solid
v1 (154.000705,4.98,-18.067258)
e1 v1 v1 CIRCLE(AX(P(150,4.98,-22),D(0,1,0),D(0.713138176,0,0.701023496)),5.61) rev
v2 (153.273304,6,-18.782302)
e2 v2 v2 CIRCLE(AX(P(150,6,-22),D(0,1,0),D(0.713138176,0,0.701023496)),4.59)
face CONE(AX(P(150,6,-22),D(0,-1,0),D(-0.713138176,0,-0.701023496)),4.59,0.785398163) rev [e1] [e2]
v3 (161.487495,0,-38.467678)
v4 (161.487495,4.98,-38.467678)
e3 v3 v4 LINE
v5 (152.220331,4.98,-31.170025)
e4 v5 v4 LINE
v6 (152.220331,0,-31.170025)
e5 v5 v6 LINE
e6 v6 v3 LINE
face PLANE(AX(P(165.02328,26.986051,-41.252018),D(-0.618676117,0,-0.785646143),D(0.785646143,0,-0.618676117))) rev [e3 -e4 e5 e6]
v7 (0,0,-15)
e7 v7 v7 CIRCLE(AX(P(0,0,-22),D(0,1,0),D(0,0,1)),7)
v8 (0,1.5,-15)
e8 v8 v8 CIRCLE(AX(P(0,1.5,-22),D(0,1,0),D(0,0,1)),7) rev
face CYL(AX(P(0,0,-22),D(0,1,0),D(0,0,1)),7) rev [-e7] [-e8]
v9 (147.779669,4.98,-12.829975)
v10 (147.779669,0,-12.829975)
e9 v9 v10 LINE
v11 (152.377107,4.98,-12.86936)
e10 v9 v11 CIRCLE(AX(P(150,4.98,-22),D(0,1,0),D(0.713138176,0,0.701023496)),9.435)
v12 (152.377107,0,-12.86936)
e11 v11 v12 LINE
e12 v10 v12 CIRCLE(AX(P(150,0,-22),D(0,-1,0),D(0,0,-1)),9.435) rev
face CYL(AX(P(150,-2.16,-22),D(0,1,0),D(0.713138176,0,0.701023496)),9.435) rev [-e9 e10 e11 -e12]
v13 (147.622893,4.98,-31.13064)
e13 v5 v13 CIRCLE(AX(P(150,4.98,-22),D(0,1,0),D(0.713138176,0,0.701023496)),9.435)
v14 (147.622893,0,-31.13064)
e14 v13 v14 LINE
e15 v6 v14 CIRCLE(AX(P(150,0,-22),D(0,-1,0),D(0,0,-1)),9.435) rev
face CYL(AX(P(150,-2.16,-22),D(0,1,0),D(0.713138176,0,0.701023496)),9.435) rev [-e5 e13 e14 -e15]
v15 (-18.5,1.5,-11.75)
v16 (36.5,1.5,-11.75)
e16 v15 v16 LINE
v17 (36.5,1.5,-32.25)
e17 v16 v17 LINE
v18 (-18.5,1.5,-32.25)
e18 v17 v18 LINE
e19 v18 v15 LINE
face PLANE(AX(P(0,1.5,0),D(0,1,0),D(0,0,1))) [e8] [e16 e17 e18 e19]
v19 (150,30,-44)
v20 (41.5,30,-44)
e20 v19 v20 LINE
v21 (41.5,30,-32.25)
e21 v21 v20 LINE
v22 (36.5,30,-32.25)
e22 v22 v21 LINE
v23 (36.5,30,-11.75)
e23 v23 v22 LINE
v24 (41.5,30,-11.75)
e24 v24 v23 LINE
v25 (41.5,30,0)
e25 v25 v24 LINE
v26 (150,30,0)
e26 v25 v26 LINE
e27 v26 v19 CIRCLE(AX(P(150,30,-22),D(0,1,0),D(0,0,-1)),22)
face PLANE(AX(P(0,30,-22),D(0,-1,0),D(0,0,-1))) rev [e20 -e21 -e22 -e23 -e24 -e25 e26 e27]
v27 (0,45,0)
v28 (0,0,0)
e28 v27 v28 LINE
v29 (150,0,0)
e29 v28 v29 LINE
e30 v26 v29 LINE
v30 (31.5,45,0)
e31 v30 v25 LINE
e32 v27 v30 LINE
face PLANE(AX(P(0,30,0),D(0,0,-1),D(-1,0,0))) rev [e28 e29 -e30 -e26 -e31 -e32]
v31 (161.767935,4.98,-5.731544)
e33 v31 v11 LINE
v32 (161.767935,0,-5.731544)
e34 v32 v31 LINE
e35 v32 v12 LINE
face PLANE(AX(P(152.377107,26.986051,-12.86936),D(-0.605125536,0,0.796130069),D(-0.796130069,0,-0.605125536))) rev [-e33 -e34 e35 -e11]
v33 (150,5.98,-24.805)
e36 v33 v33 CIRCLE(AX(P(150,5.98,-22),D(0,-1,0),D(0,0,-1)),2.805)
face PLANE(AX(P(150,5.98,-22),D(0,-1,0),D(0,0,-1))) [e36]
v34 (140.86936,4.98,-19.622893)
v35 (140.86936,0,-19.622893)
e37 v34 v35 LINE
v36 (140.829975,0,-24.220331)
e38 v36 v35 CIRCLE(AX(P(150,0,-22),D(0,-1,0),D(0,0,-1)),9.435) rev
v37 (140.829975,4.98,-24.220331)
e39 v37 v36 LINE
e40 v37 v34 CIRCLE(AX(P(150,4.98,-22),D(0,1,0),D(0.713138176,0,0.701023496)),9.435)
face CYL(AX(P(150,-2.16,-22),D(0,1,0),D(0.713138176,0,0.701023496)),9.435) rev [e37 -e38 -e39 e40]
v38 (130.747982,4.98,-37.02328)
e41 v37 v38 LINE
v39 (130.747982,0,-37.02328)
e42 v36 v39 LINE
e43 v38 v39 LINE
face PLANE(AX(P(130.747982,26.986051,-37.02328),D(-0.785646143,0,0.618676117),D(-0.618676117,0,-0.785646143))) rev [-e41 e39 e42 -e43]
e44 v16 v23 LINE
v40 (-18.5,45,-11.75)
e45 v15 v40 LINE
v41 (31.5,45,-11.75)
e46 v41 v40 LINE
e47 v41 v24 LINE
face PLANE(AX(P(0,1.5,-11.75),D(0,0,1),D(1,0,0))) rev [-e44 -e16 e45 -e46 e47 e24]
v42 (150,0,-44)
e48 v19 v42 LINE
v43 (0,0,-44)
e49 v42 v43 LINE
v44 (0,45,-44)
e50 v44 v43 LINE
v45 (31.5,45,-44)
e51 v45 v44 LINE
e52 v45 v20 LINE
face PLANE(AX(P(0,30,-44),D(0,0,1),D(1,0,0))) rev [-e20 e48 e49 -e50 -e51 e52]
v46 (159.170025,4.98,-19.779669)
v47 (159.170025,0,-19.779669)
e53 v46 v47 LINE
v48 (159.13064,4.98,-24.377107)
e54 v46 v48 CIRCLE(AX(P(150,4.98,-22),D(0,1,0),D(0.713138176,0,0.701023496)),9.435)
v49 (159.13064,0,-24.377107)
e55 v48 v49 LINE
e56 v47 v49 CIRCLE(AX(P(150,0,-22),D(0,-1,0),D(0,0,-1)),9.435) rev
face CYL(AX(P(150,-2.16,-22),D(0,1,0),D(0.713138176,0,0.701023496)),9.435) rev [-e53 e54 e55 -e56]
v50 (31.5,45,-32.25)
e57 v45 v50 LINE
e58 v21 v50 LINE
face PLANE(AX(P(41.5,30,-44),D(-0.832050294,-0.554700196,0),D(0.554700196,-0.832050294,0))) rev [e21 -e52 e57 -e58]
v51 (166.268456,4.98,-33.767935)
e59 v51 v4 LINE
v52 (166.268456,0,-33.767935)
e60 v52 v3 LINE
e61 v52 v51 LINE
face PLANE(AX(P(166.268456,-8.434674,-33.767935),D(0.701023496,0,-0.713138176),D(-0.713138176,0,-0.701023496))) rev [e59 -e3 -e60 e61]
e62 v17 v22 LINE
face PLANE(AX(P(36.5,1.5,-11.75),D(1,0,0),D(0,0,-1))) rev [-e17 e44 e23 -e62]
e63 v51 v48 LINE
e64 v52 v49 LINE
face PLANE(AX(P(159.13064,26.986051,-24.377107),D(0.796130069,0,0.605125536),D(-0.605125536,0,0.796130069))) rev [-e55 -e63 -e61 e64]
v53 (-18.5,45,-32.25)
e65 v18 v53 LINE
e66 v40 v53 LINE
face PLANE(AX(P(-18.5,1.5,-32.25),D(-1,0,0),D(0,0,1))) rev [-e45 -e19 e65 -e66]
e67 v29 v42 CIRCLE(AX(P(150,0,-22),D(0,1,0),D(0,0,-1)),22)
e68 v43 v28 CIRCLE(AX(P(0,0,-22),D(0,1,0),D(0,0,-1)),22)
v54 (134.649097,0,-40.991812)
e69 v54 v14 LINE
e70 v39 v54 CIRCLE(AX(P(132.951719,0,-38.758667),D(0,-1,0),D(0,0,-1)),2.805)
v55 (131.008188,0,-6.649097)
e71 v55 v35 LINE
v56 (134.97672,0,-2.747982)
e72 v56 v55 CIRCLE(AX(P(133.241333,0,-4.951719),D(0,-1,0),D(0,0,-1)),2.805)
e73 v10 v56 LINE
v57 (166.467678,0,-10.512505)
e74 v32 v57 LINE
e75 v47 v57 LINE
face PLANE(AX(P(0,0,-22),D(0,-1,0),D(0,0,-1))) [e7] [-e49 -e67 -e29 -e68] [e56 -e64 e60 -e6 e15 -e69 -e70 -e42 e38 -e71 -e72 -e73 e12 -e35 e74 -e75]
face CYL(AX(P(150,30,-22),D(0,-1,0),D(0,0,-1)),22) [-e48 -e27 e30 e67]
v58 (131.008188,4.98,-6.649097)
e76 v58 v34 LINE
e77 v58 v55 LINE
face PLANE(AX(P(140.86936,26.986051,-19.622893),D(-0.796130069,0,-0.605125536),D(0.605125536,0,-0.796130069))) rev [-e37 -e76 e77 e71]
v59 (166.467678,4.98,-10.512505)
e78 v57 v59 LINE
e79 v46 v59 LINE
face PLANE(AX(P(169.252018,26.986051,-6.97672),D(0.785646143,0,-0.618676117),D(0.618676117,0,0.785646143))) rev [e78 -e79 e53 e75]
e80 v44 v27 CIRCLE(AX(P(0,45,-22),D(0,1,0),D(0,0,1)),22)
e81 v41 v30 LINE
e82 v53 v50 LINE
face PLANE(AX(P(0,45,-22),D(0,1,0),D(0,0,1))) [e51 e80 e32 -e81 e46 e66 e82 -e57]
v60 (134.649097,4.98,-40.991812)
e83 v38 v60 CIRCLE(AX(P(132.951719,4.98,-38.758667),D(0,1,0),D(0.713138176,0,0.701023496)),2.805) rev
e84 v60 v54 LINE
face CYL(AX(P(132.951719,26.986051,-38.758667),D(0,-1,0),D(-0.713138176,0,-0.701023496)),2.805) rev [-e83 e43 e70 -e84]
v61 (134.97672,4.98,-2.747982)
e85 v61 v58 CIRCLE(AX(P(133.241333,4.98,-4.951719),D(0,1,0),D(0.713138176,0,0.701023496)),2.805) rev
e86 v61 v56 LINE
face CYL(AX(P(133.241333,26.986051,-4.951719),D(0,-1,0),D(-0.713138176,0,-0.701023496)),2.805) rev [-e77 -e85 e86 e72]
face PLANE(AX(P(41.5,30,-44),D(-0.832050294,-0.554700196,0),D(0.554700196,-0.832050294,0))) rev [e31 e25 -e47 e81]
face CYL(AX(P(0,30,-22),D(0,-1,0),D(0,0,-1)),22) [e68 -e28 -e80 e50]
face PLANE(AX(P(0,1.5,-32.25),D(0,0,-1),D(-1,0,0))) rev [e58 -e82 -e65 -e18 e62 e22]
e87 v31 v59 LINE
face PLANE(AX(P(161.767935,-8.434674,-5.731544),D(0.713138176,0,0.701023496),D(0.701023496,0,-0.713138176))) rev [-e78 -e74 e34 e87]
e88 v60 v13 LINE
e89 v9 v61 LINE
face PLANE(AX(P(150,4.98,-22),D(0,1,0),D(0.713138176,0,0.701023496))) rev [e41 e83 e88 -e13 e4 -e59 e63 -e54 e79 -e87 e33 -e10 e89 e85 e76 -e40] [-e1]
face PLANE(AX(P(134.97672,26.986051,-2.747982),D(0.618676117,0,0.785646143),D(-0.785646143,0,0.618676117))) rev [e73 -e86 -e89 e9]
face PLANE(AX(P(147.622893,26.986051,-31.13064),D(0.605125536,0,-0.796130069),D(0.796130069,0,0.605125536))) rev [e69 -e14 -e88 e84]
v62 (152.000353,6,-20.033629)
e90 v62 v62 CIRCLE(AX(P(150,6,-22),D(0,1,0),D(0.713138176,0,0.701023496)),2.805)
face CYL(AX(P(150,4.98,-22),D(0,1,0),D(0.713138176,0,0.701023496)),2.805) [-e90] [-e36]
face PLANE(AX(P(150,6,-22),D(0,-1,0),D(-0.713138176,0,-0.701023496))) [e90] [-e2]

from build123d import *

# Parameters (mm, degrees)
BOSS_EXTRUDE1_DEPTH = 30
SKETCH2_R           = 7
CUT_EXTRUDE1_DEPTH  = 181.055546985
CUT_EXTRUDE2_DEPTH  = 28.5
BOSS_EXTRUDE2_DEPTH = 15
CUT_EXTRUDE3_DEPTH  = 184.152941554
CAVITY1_OUTLINE_R   = 1.02
CAVITY1_DEPTH       = 4.98
CAVITY1_START       = 2.94
CAVITY1_2_OUTLINE_R = 1.683
CAVITY1_2_DEPTH     = 2.04
CAVITY1_START_2     = 4.98
CAVITY1_3_OUTLINE_R = 2.805
CAVITY1_3_DEPTH     = 1.02
SKETCH7_R           = 1.02
SKETCH7_R_2         = 5.61
CUT_EXTRUDE4_DEPTH  = 4.98
SKETCH8_R           = 2.805
CUT_EXTRUDE5_DEPTH  = 1
BOSS_EXTRUDE3_START = 4.98
BOSS_EXTRUDE3_DEPTH = 4.98


with BuildPart() as part:
    # Sketch1 → Boss-Extrude1 (new body)
    with BuildSketch(Plane(origin=(0, 0, 0), x_dir=(1, 0, 0), z_dir=(0, 1, 0))):
        with BuildLine():
            Line((0, 0), (150, 0))
            ThreePointArc((150, 0), (172, 22), (150, 44))
            Line((150, 44), (0, 44))
            ThreePointArc((0, 44), (-22, 22), (0, 0))
        make_face()
    extrude(amount=BOSS_EXTRUDE1_DEPTH)

    # Sketch2 → Cut-Extrude1 (cut, through all)
    with BuildSketch(Plane(origin=(0, 30, 0), x_dir=(1, 0, 0), z_dir=(0, 1, 0))):
        with Locations(Location((0, 22, 0), (0, 0, 270))):
            Circle(SKETCH2_R)
    extrude(amount=-CUT_EXTRUDE1_DEPTH, mode=Mode.SUBTRACT)

    # Sketch3 → Cut-Extrude2 (cut)
    with BuildSketch(Plane(origin=(0, 30, 0), x_dir=(1, 0, 0), z_dir=(0, 1, 0))):
        Polygon((0, 32.25), (-18.5, 32.25), (-18.5, 11.75), (0, 11.75), (36.5, 11.75), (36.5, 32.25), align=None)
    extrude(amount=-CUT_EXTRUDE2_DEPTH, mode=Mode.SUBTRACT)

    # Sketch5 → Boss-Extrude2 (add)
    with BuildSketch(Plane(origin=(0, 30, 0), x_dir=(1, 0, 0), z_dir=(0, 1, 0))):
        with BuildLine():
            Line((-18.5, 32.25), (-18.5, 11.75))
            Line((-18.5, 11.75), (41.5, 11.75))
            Line((41.5, 11.75), (41.5, 0))
            Line((41.5, 0), (0, 0))
            ThreePointArc((0, 0), (-22, 22), (0, 44))
            Line((0, 44), (41.5, 44))
            Line((41.5, 44), (41.5, 32.25))
            Line((41.5, 32.25), (-18.5, 32.25))
        make_face()
    extrude(amount=BOSS_EXTRUDE2_DEPTH)

    # Sketch6 → Cut-Extrude3 (cut, through all)
    with BuildSketch(Plane.XY):
        Polygon((31.5, 45), (41.5, 45), (41.5, 30), align=None)
    extrude(amount=-CUT_EXTRUDE3_DEPTH, mode=Mode.SUBTRACT)

    # Cavity1: read off the stored shape, not the designer's step
    # Cavity1 outline → Cavity1 (cut)
    with BuildSketch(Plane(origin=(0, 0, 0), x_dir=(1, 0, 0), z_dir=(0, 1, 0))):
        with BuildLine():
            ThreePointArc((147.779668933, 12.829975193), (150.080823725, 12.565346189), (152.377107132, 12.869360007))
            Line((152.377107132, 12.869360007), (163.360195023, 4.52129327))
            ThreePointArc((163.360195023, 4.52129327), (165.689039875, 6.577483091), (167.705029876, 8.941213032))
            Line((167.705029876, 8.941213032), (159.170024807, 19.779668933))
            ThreePointArc((159.170024807, 19.779668933), (159.434653811, 22.080823725), (159.130639993, 24.377107132))
            Line((159.130639993, 24.377107132), (167.47870673, 35.360195023))
            ThreePointArc((167.47870673, 35.360195023), (165.422516909, 37.689039875), (163.058786968, 39.705029876))
            Line((163.058786968, 39.705029876), (152.220331067, 31.170024807))
            ThreePointArc((152.220331067, 31.170024807), (149.919176275, 31.434653811), (147.622892868, 31.130639993))
            Line((147.622892868, 31.130639993), (134.649096594, 40.991811842))
            ThreePointArc((134.649096594, 40.991811842), (130.951366883, 40.725037906), (130.747982035, 37.023280491))
            Line((130.747982035, 37.023280491), (140.829975193, 24.220331067))
            ThreePointArc((140.829975193, 24.220331067), (140.565346189, 21.919176275), (140.869360007, 19.622892868))
            Line((140.869360007, 19.622892868), (131.008188158, 6.649096594))
            ThreePointArc((131.008188158, 6.649096594), (131.274962094, 2.951366883), (134.976719509, 2.747982035))
            Line((134.976719509, 2.747982035), (147.779668933, 12.829975193))
        make_face()
        with Locations((133.375227796, 5.087928153)):
            Circle(CAVITY1_OUTLINE_R, mode=Mode.SUBTRACT)
        with Locations((136.950447624, 8.724932851)):
            Circle(CAVITY1_OUTLINE_R, mode=Mode.SUBTRACT)
        with Locations((140.525667453, 12.36193755)):
            Circle(CAVITY1_OUTLINE_R, mode=Mode.SUBTRACT)
        with Locations((144.100887282, 15.998942248)):
            Circle(CAVITY1_OUTLINE_R, mode=Mode.SUBTRACT)
        with Locations((163.275067149, 8.950447624)):
            Circle(CAVITY1_OUTLINE_R, mode=Mode.SUBTRACT)
        with Locations((156.001057752, 16.100887282)):
            Circle(CAVITY1_OUTLINE_R, mode=Mode.SUBTRACT)
        with Locations((159.63806245, 12.525667453)):
            Circle(CAVITY1_OUTLINE_R, mode=Mode.SUBTRACT)
        with Locations((140.36193755, 31.474332547)):
            Circle(CAVITY1_OUTLINE_R, mode=Mode.SUBTRACT)
        with BuildLine():
            Line((152.373607277, 19.467574131), (152.689172923, 18.931653704))
            ThreePointArc((152.689172923, 18.931653704), (152.511383831, 18.784513838), (152.325559725, 18.647661717))
            Line((152.325559725, 18.647661717), (151.882040304, 19.083646698))
            Line((151.882040304, 19.083646698), (151.637288525, 18.939529681))
            Line((151.637288525, 18.939529681), (151.80339512, 18.340195901))
            ThreePointArc((151.80339512, 18.340195901), (151.593581444, 18.244084908), (151.378669205, 18.159990726))
            Line((151.378669205, 18.159990726), (151.063103559, 18.695911153))
            Line((151.063103559, 18.695911153), (150.789391266, 18.620051226))
            Line((150.789391266, 18.620051226), (150.794718919, 17.998147699))
            ThreePointArc((150.794718919, 17.998147699), (150.567179115, 17.959615383), (150.337824658, 17.934010022))
            Line((150.337824658, 17.934010022), (150.171718063, 18.533343802))
            Line((150.171718063, 18.533343802), (149.887698297, 18.530910694))
            Line((149.887698297, 18.530910694), (149.731883937, 17.928819118))
            ThreePointArc((149.731883937, 17.928819118), (149.502124467, 17.950491394), (149.273957918, 17.985119816))
            Line((149.273957918, 17.985119816), (149.268630266, 18.607023342))
            Line((149.268630266, 18.607023342), (148.993658503, 18.678182865))
            Line((148.993658503, 18.678182865), (148.687320622, 18.136934786))
            ThreePointArc((148.687320622, 18.136934786), (148.470999214, 18.217334723), (148.259569747, 18.309837059))
            Line((148.259569747, 18.309837059), (148.415384106, 18.911928635))
            Line((148.415384106, 18.911928635), (148.168199219, 19.051831385))
            Line((148.168199219, 19.051831385), (147.732214237, 18.608311964))
            ThreePointArc((147.732214237, 18.608311964), (147.544072837, 18.74196044), (147.363789021, 18.886032808))
            Line((147.363789021, 18.886032808), (147.670126902, 19.427280887))
            Line((147.670126902, 19.427280887), (147.467574131, 19.626392723))
            Line((147.467574131, 19.626392723), (146.931653704, 19.310827077))
            ThreePointArc((146.931653704, 19.310827077), (146.784513838, 19.488616169), (146.647661717, 19.674440275))
            Line((146.647661717, 19.674440275), (147.083646698, 20.117959696))
            Line((147.083646698, 20.117959696), (146.939529681, 20.362711475))
            Line((146.939529681, 20.362711475), (146.340195901, 20.19660488))
            ThreePointArc((146.340195901, 20.19660488), (146.244084908, 20.406418556), (146.159990726, 20.621330795))
            Line((146.159990726, 20.621330795), (146.695911153, 20.936896441))
            Line((146.695911153, 20.936896441), (146.620051226, 21.210608734))
            Line((146.620051226, 21.210608734), (145.998147699, 21.205281081))
            ThreePointArc((145.998147699, 21.205281081), (145.959615383, 21.432820885), (145.934010022, 21.662175342))
            Line((145.934010022, 21.662175342), (146.533343802, 21.828281937))
            Line((146.533343802, 21.828281937), (146.530910694, 22.112301703))
            Line((146.530910694, 22.112301703), (145.928819118, 22.268116063))
            ThreePointArc((145.928819118, 22.268116063), (145.950491394, 22.497875533), (145.985119816, 22.726042082))
            Line((145.985119816, 22.726042082), (146.607023342, 22.731369734))
            Line((146.607023342, 22.731369734), (146.678182865, 23.006341497))
            Line((146.678182865, 23.006341497), (146.136934786, 23.312679378))
            ThreePointArc((146.136934786, 23.312679378), (146.217334723, 23.529000786), (146.309837059, 23.740430253))
            Line((146.309837059, 23.740430253), (146.911928635, 23.584615894))
            Line((146.911928635, 23.584615894), (147.051831385, 23.831800781))
            Line((147.051831385, 23.831800781), (146.608311964, 24.267785763))
            ThreePointArc((146.608311964, 24.267785763), (146.74196044, 24.455927163), (146.886032808, 24.636210979))
            Line((146.886032808, 24.636210979), (147.427280887, 24.329873098))
            Line((147.427280887, 24.329873098), (147.626392723, 24.532425869))
            Line((147.626392723, 24.532425869), (147.310827077, 25.068346296))
            ThreePointArc((147.310827077, 25.068346296), (147.488616169, 25.215486162), (147.674440275, 25.352338283))
            Line((147.674440275, 25.352338283), (148.117959696, 24.916353302))
            Line((148.117959696, 24.916353302), (148.362711475, 25.060470319))
            Line((148.362711475, 25.060470319), (148.19660488, 25.659804099))
            ThreePointArc((148.19660488, 25.659804099), (148.406418556, 25.755915092), (148.621330795, 25.840009274))
            Line((148.621330795, 25.840009274), (148.936896441, 25.304088847))
            Line((148.936896441, 25.304088847), (149.210608734, 25.379948774))
            Line((149.210608734, 25.379948774), (149.205281081, 26.001852301))
            ThreePointArc((149.205281081, 26.001852301), (149.432820885, 26.040384617), (149.662175342, 26.065989978))
            Line((149.662175342, 26.065989978), (149.828281937, 25.466656198))
            Line((149.828281937, 25.466656198), (150.112301703, 25.469089306))
            Line((150.112301703, 25.469089306), (150.268116063, 26.071180882))
            ThreePointArc((150.268116063, 26.071180882), (150.497875533, 26.049508606), (150.726042082, 26.014880184))
            Line((150.726042082, 26.014880184), (150.731369734, 25.392976658))
            Line((150.731369734, 25.392976658), (151.006341497, 25.321817135))
            Line((151.006341497, 25.321817135), (151.312679378, 25.863065214))
            ThreePointArc((151.312679378, 25.863065214), (151.529000786, 25.782665277), (151.740430253, 25.690162941))
            Line((151.740430253, 25.690162941), (151.584615894, 25.088071365))
            Line((151.584615894, 25.088071365), (151.831800781, 24.948168615))
            Line((151.831800781, 24.948168615), (152.267785763, 25.391688036))
            ThreePointArc((152.267785763, 25.391688036), (152.455927163, 25.25803956), (152.636210979, 25.113967192))
            Line((152.636210979, 25.113967192), (152.329873098, 24.572719113))
            Line((152.329873098, 24.572719113), (152.532425869, 24.373607277))
            Line((152.532425869, 24.373607277), (153.068346296, 24.689172923))
            ThreePointArc((153.068346296, 24.689172923), (153.215486162, 24.511383831), (153.352338283, 24.325559725))
            Line((153.352338283, 24.325559725), (152.916353302, 23.882040304))
            Line((152.916353302, 23.882040304), (153.060470319, 23.637288525))
            Line((153.060470319, 23.637288525), (153.659804099, 23.80339512))
            ThreePointArc((153.659804099, 23.80339512), (153.755915092, 23.593581444), (153.840009274, 23.378669205))
            Line((153.840009274, 23.378669205), (153.304088847, 23.063103559))
            Line((153.304088847, 23.063103559), (153.379948774, 22.789391266))
            Line((153.379948774, 22.789391266), (154.001852301, 22.794718919))
            ThreePointArc((154.001852301, 22.794718919), (154.040384617, 22.567179115), (154.065989978, 22.337824658))
            Line((154.065989978, 22.337824658), (153.466656198, 22.171718063))
            Line((153.466656198, 22.171718063), (153.469089306, 21.887698297))
            Line((153.469089306, 21.887698297), (154.071180882, 21.731883937))
            ThreePointArc((154.071180882, 21.731883937), (154.049508606, 21.502124467), (154.014880184, 21.273957918))
            Line((154.014880184, 21.273957918), (153.392976658, 21.268630266))
            Line((153.392976658, 21.268630266), (153.321817135, 20.993658503))
            Line((153.321817135, 20.993658503), (153.863065214, 20.687320622))
            ThreePointArc((153.863065214, 20.687320622), (153.782665277, 20.470999214), (153.690162941, 20.259569747))
            Line((153.690162941, 20.259569747), (153.088071365, 20.415384106))
            Line((153.088071365, 20.415384106), (152.948168615, 20.168199219))
            Line((152.948168615, 20.168199219), (153.391688036, 19.732214237))
            ThreePointArc((153.391688036, 19.732214237), (153.25803956, 19.544072837), (153.113967192, 19.363789021))
            Line((153.113967192, 19.363789021), (152.572719113, 19.670126902))
            Line((152.572719113, 19.670126902), (152.373607277, 19.467574131))
        make_face(mode=Mode.SUBTRACT)
        with Locations((143.998942248, 27.899112718)):
            Circle(CAVITY1_OUTLINE_R, mode=Mode.SUBTRACT)
        with Locations((136.724932851, 35.049552376)):
            Circle(CAVITY1_OUTLINE_R, mode=Mode.SUBTRACT)
        with Locations((133.087928153, 38.624772204)):
            Circle(CAVITY1_OUTLINE_R, mode=Mode.SUBTRACT)
        with Locations((155.899112718, 28.001057752)):
            Circle(CAVITY1_OUTLINE_R, mode=Mode.SUBTRACT)
        with Locations((159.474332547, 31.63806245)):
            Circle(CAVITY1_OUTLINE_R, mode=Mode.SUBTRACT)
        with Locations((163.049552376, 35.275067149)):
            Circle(CAVITY1_OUTLINE_R, mode=Mode.SUBTRACT)
    extrude(amount=CAVITY1_DEPTH, mode=Mode.SUBTRACT)

    # Cavity1 2 outline → Cavity1 2 (cut)
    with BuildSketch(Plane(origin=(0, 0, 0), x_dir=(1, 0, 0), z_dir=(0, 1, 0)).offset(CAVITY1_START)):
        with BuildLine():
            ThreePointArc((152.325559725, 18.647661717), (152.511383831, 18.784513838), (152.689172923, 18.931653704))
            Line((152.689172923, 18.931653704), (152.373607277, 19.467574131))
            Line((152.373607277, 19.467574131), (152.572719113, 19.670126902))
            Line((152.572719113, 19.670126902), (153.113967192, 19.363789021))
            ThreePointArc((153.113967192, 19.363789021), (153.25803956, 19.544072837), (153.391688036, 19.732214237))
            Line((153.391688036, 19.732214237), (152.948168615, 20.168199219))
            Line((152.948168615, 20.168199219), (153.088071365, 20.415384106))
            Line((153.088071365, 20.415384106), (153.690162941, 20.259569747))
            ThreePointArc((153.690162941, 20.259569747), (153.782665277, 20.470999214), (153.863065214, 20.687320622))
            Line((153.863065214, 20.687320622), (153.321817135, 20.993658503))
            Line((153.321817135, 20.993658503), (153.392976658, 21.268630266))
            Line((153.392976658, 21.268630266), (154.014880184, 21.273957918))
            ThreePointArc((154.014880184, 21.273957918), (154.049508606, 21.502124467), (154.071180882, 21.731883937))
            Line((154.071180882, 21.731883937), (153.469089306, 21.887698297))
            Line((153.469089306, 21.887698297), (153.466656198, 22.171718063))
            Line((153.466656198, 22.171718063), (154.065989978, 22.337824658))
            ThreePointArc((154.065989978, 22.337824658), (154.040384617, 22.567179115), (154.001852301, 22.794718919))
            Line((154.001852301, 22.794718919), (153.379948774, 22.789391266))
            Line((153.379948774, 22.789391266), (153.304088847, 23.063103559))
            Line((153.304088847, 23.063103559), (153.840009274, 23.378669205))
            ThreePointArc((153.840009274, 23.378669205), (153.755915092, 23.593581444), (153.659804099, 23.80339512))
            Line((153.659804099, 23.80339512), (153.060470319, 23.637288525))
            Line((153.060470319, 23.637288525), (152.916353302, 23.882040304))
            Line((152.916353302, 23.882040304), (153.352338283, 24.325559725))
            ThreePointArc((153.352338283, 24.325559725), (153.215486162, 24.511383831), (153.068346296, 24.689172923))
            Line((153.068346296, 24.689172923), (152.532425869, 24.373607277))
            Line((152.532425869, 24.373607277), (152.329873098, 24.572719113))
            Line((152.329873098, 24.572719113), (152.636210979, 25.113967192))
            ThreePointArc((152.636210979, 25.113967192), (152.455927163, 25.25803956), (152.267785763, 25.391688036))
            Line((152.267785763, 25.391688036), (151.831800781, 24.948168615))
            Line((151.831800781, 24.948168615), (151.584615894, 25.088071365))
            Line((151.584615894, 25.088071365), (151.740430253, 25.690162941))
            ThreePointArc((151.740430253, 25.690162941), (151.529000786, 25.782665277), (151.312679378, 25.863065214))
            Line((151.312679378, 25.863065214), (151.006341497, 25.321817135))
            Line((151.006341497, 25.321817135), (150.731369734, 25.392976658))
            Line((150.731369734, 25.392976658), (150.726042082, 26.014880184))
            ThreePointArc((150.726042082, 26.014880184), (150.497875533, 26.049508606), (150.268116063, 26.071180882))
            Line((150.268116063, 26.071180882), (150.112301703, 25.469089306))
            Line((150.112301703, 25.469089306), (149.828281937, 25.466656198))
            Line((149.828281937, 25.466656198), (149.662175342, 26.065989978))
            ThreePointArc((149.662175342, 26.065989978), (149.432820885, 26.040384617), (149.205281081, 26.001852301))
            Line((149.205281081, 26.001852301), (149.210608734, 25.379948774))
            Line((149.210608734, 25.379948774), (148.936896441, 25.304088847))
            Line((148.936896441, 25.304088847), (148.621330795, 25.840009274))
            ThreePointArc((148.621330795, 25.840009274), (148.406418556, 25.755915092), (148.19660488, 25.659804099))
            Line((148.19660488, 25.659804099), (148.362711475, 25.060470319))
            Line((148.362711475, 25.060470319), (148.117959696, 24.916353302))
            Line((148.117959696, 24.916353302), (147.674440275, 25.352338283))
            ThreePointArc((147.674440275, 25.352338283), (147.488616169, 25.215486162), (147.310827077, 25.068346296))
            Line((147.310827077, 25.068346296), (147.626392723, 24.532425869))
            Line((147.626392723, 24.532425869), (147.427280887, 24.329873098))
            Line((147.427280887, 24.329873098), (146.886032808, 24.636210979))
            ThreePointArc((146.886032808, 24.636210979), (146.74196044, 24.455927163), (146.608311964, 24.267785763))
            Line((146.608311964, 24.267785763), (147.051831385, 23.831800781))
            Line((147.051831385, 23.831800781), (146.911928635, 23.584615894))
            Line((146.911928635, 23.584615894), (146.309837059, 23.740430253))
            ThreePointArc((146.309837059, 23.740430253), (146.217334723, 23.529000786), (146.136934786, 23.312679378))
            Line((146.136934786, 23.312679378), (146.678182865, 23.006341497))
            Line((146.678182865, 23.006341497), (146.607023342, 22.731369734))
            Line((146.607023342, 22.731369734), (145.985119816, 22.726042082))
            ThreePointArc((145.985119816, 22.726042082), (145.950491394, 22.497875533), (145.928819118, 22.268116063))
            Line((145.928819118, 22.268116063), (146.530910694, 22.112301703))
            Line((146.530910694, 22.112301703), (146.533343802, 21.828281937))
            Line((146.533343802, 21.828281937), (145.934010022, 21.662175342))
            ThreePointArc((145.934010022, 21.662175342), (145.959615383, 21.432820885), (145.998147699, 21.205281081))
            Line((145.998147699, 21.205281081), (146.620051226, 21.210608734))
            Line((146.620051226, 21.210608734), (146.695911153, 20.936896441))
            Line((146.695911153, 20.936896441), (146.159990726, 20.621330795))
            ThreePointArc((146.159990726, 20.621330795), (146.244084908, 20.406418556), (146.340195901, 20.19660488))
            Line((146.340195901, 20.19660488), (146.939529681, 20.362711475))
            Line((146.939529681, 20.362711475), (147.083646698, 20.117959696))
            Line((147.083646698, 20.117959696), (146.647661717, 19.674440275))
            ThreePointArc((146.647661717, 19.674440275), (146.784513838, 19.488616169), (146.931653704, 19.310827077))
            Line((146.931653704, 19.310827077), (147.467574131, 19.626392723))
            Line((147.467574131, 19.626392723), (147.670126902, 19.427280887))
            Line((147.670126902, 19.427280887), (147.363789021, 18.886032808))
            ThreePointArc((147.363789021, 18.886032808), (147.544072837, 18.74196044), (147.732214237, 18.608311964))
            Line((147.732214237, 18.608311964), (148.168199219, 19.051831385))
            Line((148.168199219, 19.051831385), (148.415384106, 18.911928635))
            Line((148.415384106, 18.911928635), (148.259569747, 18.309837059))
            ThreePointArc((148.259569747, 18.309837059), (148.470999214, 18.217334723), (148.687320622, 18.136934786))
            Line((148.687320622, 18.136934786), (148.993658503, 18.678182865))
            Line((148.993658503, 18.678182865), (149.268630266, 18.607023342))
            Line((149.268630266, 18.607023342), (149.273957918, 17.985119816))
            ThreePointArc((149.273957918, 17.985119816), (149.502124467, 17.950491394), (149.731883937, 17.928819118))
            Line((149.731883937, 17.928819118), (149.887698297, 18.530910694))
            Line((149.887698297, 18.530910694), (150.171718063, 18.533343802))
            Line((150.171718063, 18.533343802), (150.337824658, 17.934010022))
            ThreePointArc((150.337824658, 17.934010022), (150.567179115, 17.959615383), (150.794718919, 17.998147699))
            Line((150.794718919, 17.998147699), (150.789391266, 18.620051226))
            Line((150.789391266, 18.620051226), (151.063103559, 18.695911153))
            Line((151.063103559, 18.695911153), (151.378669205, 18.159990726))
            ThreePointArc((151.378669205, 18.159990726), (151.593581444, 18.244084908), (151.80339512, 18.340195901))
            Line((151.80339512, 18.340195901), (151.637288525, 18.939529681))
            Line((151.637288525, 18.939529681), (151.882040304, 19.083646698))
            Line((151.882040304, 19.083646698), (152.325559725, 18.647661717))
        make_face()
        with Locations((150, 22)):
            Circle(CAVITY1_2_OUTLINE_R, mode=Mode.SUBTRACT)
    extrude(amount=CAVITY1_2_DEPTH, mode=Mode.SUBTRACT)

    # Cavity1 3 outline → Cavity1 3 (cut)
    with BuildSketch(Plane(origin=(0, 0, 0), x_dir=(1, 0, 0), z_dir=(0, 1, 0)).offset(CAVITY1_START_2)):
        with BuildLine():
            ThreePointArc((152.325559725, 18.647661717), (152.511383831, 18.784513838), (152.689172923, 18.931653704))
            Line((152.689172923, 18.931653704), (152.373607277, 19.467574131))
            Line((152.373607277, 19.467574131), (152.572719113, 19.670126902))
            Line((152.572719113, 19.670126902), (153.113967192, 19.363789021))
            ThreePointArc((153.113967192, 19.363789021), (153.25803956, 19.544072837), (153.391688036, 19.732214237))
            Line((153.391688036, 19.732214237), (152.948168615, 20.168199219))
            Line((152.948168615, 20.168199219), (153.088071365, 20.415384106))
            Line((153.088071365, 20.415384106), (153.690162941, 20.259569747))
            ThreePointArc((153.690162941, 20.259569747), (153.782665277, 20.470999214), (153.863065214, 20.687320622))
            Line((153.863065214, 20.687320622), (153.321817135, 20.993658503))
            Line((153.321817135, 20.993658503), (153.392976658, 21.268630266))
            Line((153.392976658, 21.268630266), (154.014880184, 21.273957918))
            ThreePointArc((154.014880184, 21.273957918), (154.049508606, 21.502124467), (154.071180882, 21.731883937))
            Line((154.071180882, 21.731883937), (153.469089306, 21.887698297))
            Line((153.469089306, 21.887698297), (153.466656198, 22.171718063))
            Line((153.466656198, 22.171718063), (154.065989978, 22.337824658))
            ThreePointArc((154.065989978, 22.337824658), (154.040384617, 22.567179115), (154.001852301, 22.794718919))
            Line((154.001852301, 22.794718919), (153.379948774, 22.789391266))
            Line((153.379948774, 22.789391266), (153.304088847, 23.063103559))
            Line((153.304088847, 23.063103559), (153.840009274, 23.378669205))
            ThreePointArc((153.840009274, 23.378669205), (153.755915092, 23.593581444), (153.659804099, 23.80339512))
            Line((153.659804099, 23.80339512), (153.060470319, 23.637288525))
            Line((153.060470319, 23.637288525), (152.916353302, 23.882040304))
            Line((152.916353302, 23.882040304), (153.352338283, 24.325559725))
            ThreePointArc((153.352338283, 24.325559725), (153.215486162, 24.511383831), (153.068346296, 24.689172923))
            Line((153.068346296, 24.689172923), (152.532425869, 24.373607277))
            Line((152.532425869, 24.373607277), (152.329873098, 24.572719113))
            Line((152.329873098, 24.572719113), (152.636210979, 25.113967192))
            ThreePointArc((152.636210979, 25.113967192), (152.455927163, 25.25803956), (152.267785763, 25.391688036))
            Line((152.267785763, 25.391688036), (151.831800781, 24.948168615))
            Line((151.831800781, 24.948168615), (151.584615894, 25.088071365))
            Line((151.584615894, 25.088071365), (151.740430253, 25.690162941))
            ThreePointArc((151.740430253, 25.690162941), (151.529000786, 25.782665277), (151.312679378, 25.863065214))
            Line((151.312679378, 25.863065214), (151.006341497, 25.321817135))
            Line((151.006341497, 25.321817135), (150.731369734, 25.392976658))
            Line((150.731369734, 25.392976658), (150.726042082, 26.014880184))
            ThreePointArc((150.726042082, 26.014880184), (150.497875533, 26.049508606), (150.268116063, 26.071180882))
            Line((150.268116063, 26.071180882), (150.112301703, 25.469089306))
            Line((150.112301703, 25.469089306), (149.828281937, 25.466656198))
            Line((149.828281937, 25.466656198), (149.662175342, 26.065989978))
            ThreePointArc((149.662175342, 26.065989978), (149.432820885, 26.040384617), (149.205281081, 26.001852301))
            Line((149.205281081, 26.001852301), (149.210608734, 25.379948774))
            Line((149.210608734, 25.379948774), (148.936896441, 25.304088847))
            Line((148.936896441, 25.304088847), (148.621330795, 25.840009274))
            ThreePointArc((148.621330795, 25.840009274), (148.406418556, 25.755915092), (148.19660488, 25.659804099))
            Line((148.19660488, 25.659804099), (148.362711475, 25.060470319))
            Line((148.362711475, 25.060470319), (148.117959696, 24.916353302))
            Line((148.117959696, 24.916353302), (147.674440275, 25.352338283))
            ThreePointArc((147.674440275, 25.352338283), (147.488616169, 25.215486162), (147.310827077, 25.068346296))
            Line((147.310827077, 25.068346296), (147.626392723, 24.532425869))
            Line((147.626392723, 24.532425869), (147.427280887, 24.329873098))
            Line((147.427280887, 24.329873098), (146.886032808, 24.636210979))
            ThreePointArc((146.886032808, 24.636210979), (146.74196044, 24.455927163), (146.608311964, 24.267785763))
            Line((146.608311964, 24.267785763), (147.051831385, 23.831800781))
            Line((147.051831385, 23.831800781), (146.911928635, 23.584615894))
            Line((146.911928635, 23.584615894), (146.309837059, 23.740430253))
            ThreePointArc((146.309837059, 23.740430253), (146.217334723, 23.529000786), (146.136934786, 23.312679378))
            Line((146.136934786, 23.312679378), (146.678182865, 23.006341497))
            Line((146.678182865, 23.006341497), (146.607023342, 22.731369734))
            Line((146.607023342, 22.731369734), (145.985119816, 22.726042082))
            ThreePointArc((145.985119816, 22.726042082), (145.950491394, 22.497875533), (145.928819118, 22.268116063))
            Line((145.928819118, 22.268116063), (146.530910694, 22.112301703))
            Line((146.530910694, 22.112301703), (146.533343802, 21.828281937))
            Line((146.533343802, 21.828281937), (145.934010022, 21.662175342))
            ThreePointArc((145.934010022, 21.662175342), (145.959615383, 21.432820885), (145.998147699, 21.205281081))
            Line((145.998147699, 21.205281081), (146.620051226, 21.210608734))
            Line((146.620051226, 21.210608734), (146.695911153, 20.936896441))
            Line((146.695911153, 20.936896441), (146.159990726, 20.621330795))
            ThreePointArc((146.159990726, 20.621330795), (146.244084908, 20.406418556), (146.340195901, 20.19660488))
            Line((146.340195901, 20.19660488), (146.939529681, 20.362711475))
            Line((146.939529681, 20.362711475), (147.083646698, 20.117959696))
            Line((147.083646698, 20.117959696), (146.647661717, 19.674440275))
            ThreePointArc((146.647661717, 19.674440275), (146.784513838, 19.488616169), (146.931653704, 19.310827077))
            Line((146.931653704, 19.310827077), (147.467574131, 19.626392723))
            Line((147.467574131, 19.626392723), (147.670126902, 19.427280887))
            Line((147.670126902, 19.427280887), (147.363789021, 18.886032808))
            ThreePointArc((147.363789021, 18.886032808), (147.544072837, 18.74196044), (147.732214237, 18.608311964))
            Line((147.732214237, 18.608311964), (148.168199219, 19.051831385))
            Line((148.168199219, 19.051831385), (148.415384106, 18.911928635))
            Line((148.415384106, 18.911928635), (148.259569747, 18.309837059))
            ThreePointArc((148.259569747, 18.309837059), (148.470999214, 18.217334723), (148.687320622, 18.136934786))
            Line((148.687320622, 18.136934786), (148.993658503, 18.678182865))
            Line((148.993658503, 18.678182865), (149.268630266, 18.607023342))
            Line((149.268630266, 18.607023342), (149.273957918, 17.985119816))
            ThreePointArc((149.273957918, 17.985119816), (149.502124467, 17.950491394), (149.731883937, 17.928819118))
            Line((149.731883937, 17.928819118), (149.887698297, 18.530910694))
            Line((149.887698297, 18.530910694), (150.171718063, 18.533343802))
            Line((150.171718063, 18.533343802), (150.337824658, 17.934010022))
            ThreePointArc((150.337824658, 17.934010022), (150.567179115, 17.959615383), (150.794718919, 17.998147699))
            Line((150.794718919, 17.998147699), (150.789391266, 18.620051226))
            Line((150.789391266, 18.620051226), (151.063103559, 18.695911153))
            Line((151.063103559, 18.695911153), (151.378669205, 18.159990726))
            ThreePointArc((151.378669205, 18.159990726), (151.593581444, 18.244084908), (151.80339512, 18.340195901))
            Line((151.80339512, 18.340195901), (151.637288525, 18.939529681))
            Line((151.637288525, 18.939529681), (151.882040304, 19.083646698))
            Line((151.882040304, 19.083646698), (152.325559725, 18.647661717))
        make_face()
        with Locations((150, 22)):
            Circle(CAVITY1_3_OUTLINE_R, mode=Mode.SUBTRACT)
    extrude(amount=CAVITY1_3_DEPTH, mode=Mode.SUBTRACT)

    # Cavity1 4 outline → Cavity1 4 (revolve, cut)
    with BuildSketch(Plane(origin=(150, 0, -22), x_dir=(1, 0, 0), z_dir=(0, 0, 1))):
        Polygon((2.805, 6), (2.805, 4.98), (5.61, 4.98), (4.59, 6), align=None)
    revolve(axis=Axis((150, 0, -22), (0, 1, 0)), mode=Mode.SUBTRACT)

    # Sketch7 → Cut-Extrude4 (cut)
    with BuildSketch(Plane.XZ):
        with Locations((133.375227796, -5.087928153)):
            Circle(SKETCH7_R)
        with Locations((136.950447624, -8.724932851)):
            Circle(SKETCH7_R)
        with Locations((140.525667453, -12.36193755)):
            Circle(SKETCH7_R)
        with Locations((144.100887282, -15.998942248)):
            Circle(SKETCH7_R)
        with Locations((156.001057752, -16.100887282)):
            Circle(SKETCH7_R)
        with Locations((159.63806245, -12.525667453)):
            Circle(SKETCH7_R)
        with Locations((163.275067149, -8.950447624)):
            Circle(SKETCH7_R)
        with Locations((143.998942248, -27.899112718)):
            Circle(SKETCH7_R)
        with Locations((140.36193755, -31.474332547)):
            Circle(SKETCH7_R)
        with Locations((136.724932851, -35.049552376)):
            Circle(SKETCH7_R)
        with Locations((133.087928153, -38.624772204)):
            Circle(SKETCH7_R)
        with Locations((155.899112718, -28.001057752)):
            Circle(SKETCH7_R)
        with Locations((159.474332547, -31.63806245)):
            Circle(SKETCH7_R)
        with Locations((163.049552376, -35.275067149)):
            Circle(SKETCH7_R)
        with Locations((150, -22)):
            Circle(SKETCH7_R_2)
    extrude(amount=-CUT_EXTRUDE4_DEPTH, mode=Mode.SUBTRACT)

    # Sketch8 → Cut-Extrude5 (cut)
    with BuildSketch(Plane.XZ.offset(-4.98)):
        with Locations(Location((150, -22, 0), (0, 0, 44.509177003))):
            Circle(SKETCH8_R)
    extrude(amount=-CUT_EXTRUDE5_DEPTH, mode=Mode.SUBTRACT)

    # Sketch9 → Boss-Extrude3 (add)
    with BuildSketch(Plane.XZ.offset(-4.98).offset(BOSS_EXTRUDE3_START)):
        with BuildLine():
            Line((161.767934886, -5.731544342), (163.360195023, -4.52129327))
            ThreePointArc((163.360195023, -4.52129327), (165.689039875, -6.577483091), (167.705029876, -8.941213032))
            Line((167.705029876, -8.941213032), (166.467677642, -10.512505318))
            Line((166.467677642, -10.512505318), (161.767934886, -5.731544342))
        make_face()
        with BuildLine():
            Line((167.47870673, -35.360195023), (166.268455658, -33.767934886))
            Line((166.268455658, -33.767934886), (161.487494682, -38.467677642))
            Line((161.487494682, -38.467677642), (163.058786968, -39.705029876))
            ThreePointArc((163.058786968, -39.705029876), (165.422516909, -37.689039875), (167.47870673, -35.360195023))
        make_face()
    extrude(amount=-BOSS_EXTRUDE3_DEPTH)


solid = part.part
